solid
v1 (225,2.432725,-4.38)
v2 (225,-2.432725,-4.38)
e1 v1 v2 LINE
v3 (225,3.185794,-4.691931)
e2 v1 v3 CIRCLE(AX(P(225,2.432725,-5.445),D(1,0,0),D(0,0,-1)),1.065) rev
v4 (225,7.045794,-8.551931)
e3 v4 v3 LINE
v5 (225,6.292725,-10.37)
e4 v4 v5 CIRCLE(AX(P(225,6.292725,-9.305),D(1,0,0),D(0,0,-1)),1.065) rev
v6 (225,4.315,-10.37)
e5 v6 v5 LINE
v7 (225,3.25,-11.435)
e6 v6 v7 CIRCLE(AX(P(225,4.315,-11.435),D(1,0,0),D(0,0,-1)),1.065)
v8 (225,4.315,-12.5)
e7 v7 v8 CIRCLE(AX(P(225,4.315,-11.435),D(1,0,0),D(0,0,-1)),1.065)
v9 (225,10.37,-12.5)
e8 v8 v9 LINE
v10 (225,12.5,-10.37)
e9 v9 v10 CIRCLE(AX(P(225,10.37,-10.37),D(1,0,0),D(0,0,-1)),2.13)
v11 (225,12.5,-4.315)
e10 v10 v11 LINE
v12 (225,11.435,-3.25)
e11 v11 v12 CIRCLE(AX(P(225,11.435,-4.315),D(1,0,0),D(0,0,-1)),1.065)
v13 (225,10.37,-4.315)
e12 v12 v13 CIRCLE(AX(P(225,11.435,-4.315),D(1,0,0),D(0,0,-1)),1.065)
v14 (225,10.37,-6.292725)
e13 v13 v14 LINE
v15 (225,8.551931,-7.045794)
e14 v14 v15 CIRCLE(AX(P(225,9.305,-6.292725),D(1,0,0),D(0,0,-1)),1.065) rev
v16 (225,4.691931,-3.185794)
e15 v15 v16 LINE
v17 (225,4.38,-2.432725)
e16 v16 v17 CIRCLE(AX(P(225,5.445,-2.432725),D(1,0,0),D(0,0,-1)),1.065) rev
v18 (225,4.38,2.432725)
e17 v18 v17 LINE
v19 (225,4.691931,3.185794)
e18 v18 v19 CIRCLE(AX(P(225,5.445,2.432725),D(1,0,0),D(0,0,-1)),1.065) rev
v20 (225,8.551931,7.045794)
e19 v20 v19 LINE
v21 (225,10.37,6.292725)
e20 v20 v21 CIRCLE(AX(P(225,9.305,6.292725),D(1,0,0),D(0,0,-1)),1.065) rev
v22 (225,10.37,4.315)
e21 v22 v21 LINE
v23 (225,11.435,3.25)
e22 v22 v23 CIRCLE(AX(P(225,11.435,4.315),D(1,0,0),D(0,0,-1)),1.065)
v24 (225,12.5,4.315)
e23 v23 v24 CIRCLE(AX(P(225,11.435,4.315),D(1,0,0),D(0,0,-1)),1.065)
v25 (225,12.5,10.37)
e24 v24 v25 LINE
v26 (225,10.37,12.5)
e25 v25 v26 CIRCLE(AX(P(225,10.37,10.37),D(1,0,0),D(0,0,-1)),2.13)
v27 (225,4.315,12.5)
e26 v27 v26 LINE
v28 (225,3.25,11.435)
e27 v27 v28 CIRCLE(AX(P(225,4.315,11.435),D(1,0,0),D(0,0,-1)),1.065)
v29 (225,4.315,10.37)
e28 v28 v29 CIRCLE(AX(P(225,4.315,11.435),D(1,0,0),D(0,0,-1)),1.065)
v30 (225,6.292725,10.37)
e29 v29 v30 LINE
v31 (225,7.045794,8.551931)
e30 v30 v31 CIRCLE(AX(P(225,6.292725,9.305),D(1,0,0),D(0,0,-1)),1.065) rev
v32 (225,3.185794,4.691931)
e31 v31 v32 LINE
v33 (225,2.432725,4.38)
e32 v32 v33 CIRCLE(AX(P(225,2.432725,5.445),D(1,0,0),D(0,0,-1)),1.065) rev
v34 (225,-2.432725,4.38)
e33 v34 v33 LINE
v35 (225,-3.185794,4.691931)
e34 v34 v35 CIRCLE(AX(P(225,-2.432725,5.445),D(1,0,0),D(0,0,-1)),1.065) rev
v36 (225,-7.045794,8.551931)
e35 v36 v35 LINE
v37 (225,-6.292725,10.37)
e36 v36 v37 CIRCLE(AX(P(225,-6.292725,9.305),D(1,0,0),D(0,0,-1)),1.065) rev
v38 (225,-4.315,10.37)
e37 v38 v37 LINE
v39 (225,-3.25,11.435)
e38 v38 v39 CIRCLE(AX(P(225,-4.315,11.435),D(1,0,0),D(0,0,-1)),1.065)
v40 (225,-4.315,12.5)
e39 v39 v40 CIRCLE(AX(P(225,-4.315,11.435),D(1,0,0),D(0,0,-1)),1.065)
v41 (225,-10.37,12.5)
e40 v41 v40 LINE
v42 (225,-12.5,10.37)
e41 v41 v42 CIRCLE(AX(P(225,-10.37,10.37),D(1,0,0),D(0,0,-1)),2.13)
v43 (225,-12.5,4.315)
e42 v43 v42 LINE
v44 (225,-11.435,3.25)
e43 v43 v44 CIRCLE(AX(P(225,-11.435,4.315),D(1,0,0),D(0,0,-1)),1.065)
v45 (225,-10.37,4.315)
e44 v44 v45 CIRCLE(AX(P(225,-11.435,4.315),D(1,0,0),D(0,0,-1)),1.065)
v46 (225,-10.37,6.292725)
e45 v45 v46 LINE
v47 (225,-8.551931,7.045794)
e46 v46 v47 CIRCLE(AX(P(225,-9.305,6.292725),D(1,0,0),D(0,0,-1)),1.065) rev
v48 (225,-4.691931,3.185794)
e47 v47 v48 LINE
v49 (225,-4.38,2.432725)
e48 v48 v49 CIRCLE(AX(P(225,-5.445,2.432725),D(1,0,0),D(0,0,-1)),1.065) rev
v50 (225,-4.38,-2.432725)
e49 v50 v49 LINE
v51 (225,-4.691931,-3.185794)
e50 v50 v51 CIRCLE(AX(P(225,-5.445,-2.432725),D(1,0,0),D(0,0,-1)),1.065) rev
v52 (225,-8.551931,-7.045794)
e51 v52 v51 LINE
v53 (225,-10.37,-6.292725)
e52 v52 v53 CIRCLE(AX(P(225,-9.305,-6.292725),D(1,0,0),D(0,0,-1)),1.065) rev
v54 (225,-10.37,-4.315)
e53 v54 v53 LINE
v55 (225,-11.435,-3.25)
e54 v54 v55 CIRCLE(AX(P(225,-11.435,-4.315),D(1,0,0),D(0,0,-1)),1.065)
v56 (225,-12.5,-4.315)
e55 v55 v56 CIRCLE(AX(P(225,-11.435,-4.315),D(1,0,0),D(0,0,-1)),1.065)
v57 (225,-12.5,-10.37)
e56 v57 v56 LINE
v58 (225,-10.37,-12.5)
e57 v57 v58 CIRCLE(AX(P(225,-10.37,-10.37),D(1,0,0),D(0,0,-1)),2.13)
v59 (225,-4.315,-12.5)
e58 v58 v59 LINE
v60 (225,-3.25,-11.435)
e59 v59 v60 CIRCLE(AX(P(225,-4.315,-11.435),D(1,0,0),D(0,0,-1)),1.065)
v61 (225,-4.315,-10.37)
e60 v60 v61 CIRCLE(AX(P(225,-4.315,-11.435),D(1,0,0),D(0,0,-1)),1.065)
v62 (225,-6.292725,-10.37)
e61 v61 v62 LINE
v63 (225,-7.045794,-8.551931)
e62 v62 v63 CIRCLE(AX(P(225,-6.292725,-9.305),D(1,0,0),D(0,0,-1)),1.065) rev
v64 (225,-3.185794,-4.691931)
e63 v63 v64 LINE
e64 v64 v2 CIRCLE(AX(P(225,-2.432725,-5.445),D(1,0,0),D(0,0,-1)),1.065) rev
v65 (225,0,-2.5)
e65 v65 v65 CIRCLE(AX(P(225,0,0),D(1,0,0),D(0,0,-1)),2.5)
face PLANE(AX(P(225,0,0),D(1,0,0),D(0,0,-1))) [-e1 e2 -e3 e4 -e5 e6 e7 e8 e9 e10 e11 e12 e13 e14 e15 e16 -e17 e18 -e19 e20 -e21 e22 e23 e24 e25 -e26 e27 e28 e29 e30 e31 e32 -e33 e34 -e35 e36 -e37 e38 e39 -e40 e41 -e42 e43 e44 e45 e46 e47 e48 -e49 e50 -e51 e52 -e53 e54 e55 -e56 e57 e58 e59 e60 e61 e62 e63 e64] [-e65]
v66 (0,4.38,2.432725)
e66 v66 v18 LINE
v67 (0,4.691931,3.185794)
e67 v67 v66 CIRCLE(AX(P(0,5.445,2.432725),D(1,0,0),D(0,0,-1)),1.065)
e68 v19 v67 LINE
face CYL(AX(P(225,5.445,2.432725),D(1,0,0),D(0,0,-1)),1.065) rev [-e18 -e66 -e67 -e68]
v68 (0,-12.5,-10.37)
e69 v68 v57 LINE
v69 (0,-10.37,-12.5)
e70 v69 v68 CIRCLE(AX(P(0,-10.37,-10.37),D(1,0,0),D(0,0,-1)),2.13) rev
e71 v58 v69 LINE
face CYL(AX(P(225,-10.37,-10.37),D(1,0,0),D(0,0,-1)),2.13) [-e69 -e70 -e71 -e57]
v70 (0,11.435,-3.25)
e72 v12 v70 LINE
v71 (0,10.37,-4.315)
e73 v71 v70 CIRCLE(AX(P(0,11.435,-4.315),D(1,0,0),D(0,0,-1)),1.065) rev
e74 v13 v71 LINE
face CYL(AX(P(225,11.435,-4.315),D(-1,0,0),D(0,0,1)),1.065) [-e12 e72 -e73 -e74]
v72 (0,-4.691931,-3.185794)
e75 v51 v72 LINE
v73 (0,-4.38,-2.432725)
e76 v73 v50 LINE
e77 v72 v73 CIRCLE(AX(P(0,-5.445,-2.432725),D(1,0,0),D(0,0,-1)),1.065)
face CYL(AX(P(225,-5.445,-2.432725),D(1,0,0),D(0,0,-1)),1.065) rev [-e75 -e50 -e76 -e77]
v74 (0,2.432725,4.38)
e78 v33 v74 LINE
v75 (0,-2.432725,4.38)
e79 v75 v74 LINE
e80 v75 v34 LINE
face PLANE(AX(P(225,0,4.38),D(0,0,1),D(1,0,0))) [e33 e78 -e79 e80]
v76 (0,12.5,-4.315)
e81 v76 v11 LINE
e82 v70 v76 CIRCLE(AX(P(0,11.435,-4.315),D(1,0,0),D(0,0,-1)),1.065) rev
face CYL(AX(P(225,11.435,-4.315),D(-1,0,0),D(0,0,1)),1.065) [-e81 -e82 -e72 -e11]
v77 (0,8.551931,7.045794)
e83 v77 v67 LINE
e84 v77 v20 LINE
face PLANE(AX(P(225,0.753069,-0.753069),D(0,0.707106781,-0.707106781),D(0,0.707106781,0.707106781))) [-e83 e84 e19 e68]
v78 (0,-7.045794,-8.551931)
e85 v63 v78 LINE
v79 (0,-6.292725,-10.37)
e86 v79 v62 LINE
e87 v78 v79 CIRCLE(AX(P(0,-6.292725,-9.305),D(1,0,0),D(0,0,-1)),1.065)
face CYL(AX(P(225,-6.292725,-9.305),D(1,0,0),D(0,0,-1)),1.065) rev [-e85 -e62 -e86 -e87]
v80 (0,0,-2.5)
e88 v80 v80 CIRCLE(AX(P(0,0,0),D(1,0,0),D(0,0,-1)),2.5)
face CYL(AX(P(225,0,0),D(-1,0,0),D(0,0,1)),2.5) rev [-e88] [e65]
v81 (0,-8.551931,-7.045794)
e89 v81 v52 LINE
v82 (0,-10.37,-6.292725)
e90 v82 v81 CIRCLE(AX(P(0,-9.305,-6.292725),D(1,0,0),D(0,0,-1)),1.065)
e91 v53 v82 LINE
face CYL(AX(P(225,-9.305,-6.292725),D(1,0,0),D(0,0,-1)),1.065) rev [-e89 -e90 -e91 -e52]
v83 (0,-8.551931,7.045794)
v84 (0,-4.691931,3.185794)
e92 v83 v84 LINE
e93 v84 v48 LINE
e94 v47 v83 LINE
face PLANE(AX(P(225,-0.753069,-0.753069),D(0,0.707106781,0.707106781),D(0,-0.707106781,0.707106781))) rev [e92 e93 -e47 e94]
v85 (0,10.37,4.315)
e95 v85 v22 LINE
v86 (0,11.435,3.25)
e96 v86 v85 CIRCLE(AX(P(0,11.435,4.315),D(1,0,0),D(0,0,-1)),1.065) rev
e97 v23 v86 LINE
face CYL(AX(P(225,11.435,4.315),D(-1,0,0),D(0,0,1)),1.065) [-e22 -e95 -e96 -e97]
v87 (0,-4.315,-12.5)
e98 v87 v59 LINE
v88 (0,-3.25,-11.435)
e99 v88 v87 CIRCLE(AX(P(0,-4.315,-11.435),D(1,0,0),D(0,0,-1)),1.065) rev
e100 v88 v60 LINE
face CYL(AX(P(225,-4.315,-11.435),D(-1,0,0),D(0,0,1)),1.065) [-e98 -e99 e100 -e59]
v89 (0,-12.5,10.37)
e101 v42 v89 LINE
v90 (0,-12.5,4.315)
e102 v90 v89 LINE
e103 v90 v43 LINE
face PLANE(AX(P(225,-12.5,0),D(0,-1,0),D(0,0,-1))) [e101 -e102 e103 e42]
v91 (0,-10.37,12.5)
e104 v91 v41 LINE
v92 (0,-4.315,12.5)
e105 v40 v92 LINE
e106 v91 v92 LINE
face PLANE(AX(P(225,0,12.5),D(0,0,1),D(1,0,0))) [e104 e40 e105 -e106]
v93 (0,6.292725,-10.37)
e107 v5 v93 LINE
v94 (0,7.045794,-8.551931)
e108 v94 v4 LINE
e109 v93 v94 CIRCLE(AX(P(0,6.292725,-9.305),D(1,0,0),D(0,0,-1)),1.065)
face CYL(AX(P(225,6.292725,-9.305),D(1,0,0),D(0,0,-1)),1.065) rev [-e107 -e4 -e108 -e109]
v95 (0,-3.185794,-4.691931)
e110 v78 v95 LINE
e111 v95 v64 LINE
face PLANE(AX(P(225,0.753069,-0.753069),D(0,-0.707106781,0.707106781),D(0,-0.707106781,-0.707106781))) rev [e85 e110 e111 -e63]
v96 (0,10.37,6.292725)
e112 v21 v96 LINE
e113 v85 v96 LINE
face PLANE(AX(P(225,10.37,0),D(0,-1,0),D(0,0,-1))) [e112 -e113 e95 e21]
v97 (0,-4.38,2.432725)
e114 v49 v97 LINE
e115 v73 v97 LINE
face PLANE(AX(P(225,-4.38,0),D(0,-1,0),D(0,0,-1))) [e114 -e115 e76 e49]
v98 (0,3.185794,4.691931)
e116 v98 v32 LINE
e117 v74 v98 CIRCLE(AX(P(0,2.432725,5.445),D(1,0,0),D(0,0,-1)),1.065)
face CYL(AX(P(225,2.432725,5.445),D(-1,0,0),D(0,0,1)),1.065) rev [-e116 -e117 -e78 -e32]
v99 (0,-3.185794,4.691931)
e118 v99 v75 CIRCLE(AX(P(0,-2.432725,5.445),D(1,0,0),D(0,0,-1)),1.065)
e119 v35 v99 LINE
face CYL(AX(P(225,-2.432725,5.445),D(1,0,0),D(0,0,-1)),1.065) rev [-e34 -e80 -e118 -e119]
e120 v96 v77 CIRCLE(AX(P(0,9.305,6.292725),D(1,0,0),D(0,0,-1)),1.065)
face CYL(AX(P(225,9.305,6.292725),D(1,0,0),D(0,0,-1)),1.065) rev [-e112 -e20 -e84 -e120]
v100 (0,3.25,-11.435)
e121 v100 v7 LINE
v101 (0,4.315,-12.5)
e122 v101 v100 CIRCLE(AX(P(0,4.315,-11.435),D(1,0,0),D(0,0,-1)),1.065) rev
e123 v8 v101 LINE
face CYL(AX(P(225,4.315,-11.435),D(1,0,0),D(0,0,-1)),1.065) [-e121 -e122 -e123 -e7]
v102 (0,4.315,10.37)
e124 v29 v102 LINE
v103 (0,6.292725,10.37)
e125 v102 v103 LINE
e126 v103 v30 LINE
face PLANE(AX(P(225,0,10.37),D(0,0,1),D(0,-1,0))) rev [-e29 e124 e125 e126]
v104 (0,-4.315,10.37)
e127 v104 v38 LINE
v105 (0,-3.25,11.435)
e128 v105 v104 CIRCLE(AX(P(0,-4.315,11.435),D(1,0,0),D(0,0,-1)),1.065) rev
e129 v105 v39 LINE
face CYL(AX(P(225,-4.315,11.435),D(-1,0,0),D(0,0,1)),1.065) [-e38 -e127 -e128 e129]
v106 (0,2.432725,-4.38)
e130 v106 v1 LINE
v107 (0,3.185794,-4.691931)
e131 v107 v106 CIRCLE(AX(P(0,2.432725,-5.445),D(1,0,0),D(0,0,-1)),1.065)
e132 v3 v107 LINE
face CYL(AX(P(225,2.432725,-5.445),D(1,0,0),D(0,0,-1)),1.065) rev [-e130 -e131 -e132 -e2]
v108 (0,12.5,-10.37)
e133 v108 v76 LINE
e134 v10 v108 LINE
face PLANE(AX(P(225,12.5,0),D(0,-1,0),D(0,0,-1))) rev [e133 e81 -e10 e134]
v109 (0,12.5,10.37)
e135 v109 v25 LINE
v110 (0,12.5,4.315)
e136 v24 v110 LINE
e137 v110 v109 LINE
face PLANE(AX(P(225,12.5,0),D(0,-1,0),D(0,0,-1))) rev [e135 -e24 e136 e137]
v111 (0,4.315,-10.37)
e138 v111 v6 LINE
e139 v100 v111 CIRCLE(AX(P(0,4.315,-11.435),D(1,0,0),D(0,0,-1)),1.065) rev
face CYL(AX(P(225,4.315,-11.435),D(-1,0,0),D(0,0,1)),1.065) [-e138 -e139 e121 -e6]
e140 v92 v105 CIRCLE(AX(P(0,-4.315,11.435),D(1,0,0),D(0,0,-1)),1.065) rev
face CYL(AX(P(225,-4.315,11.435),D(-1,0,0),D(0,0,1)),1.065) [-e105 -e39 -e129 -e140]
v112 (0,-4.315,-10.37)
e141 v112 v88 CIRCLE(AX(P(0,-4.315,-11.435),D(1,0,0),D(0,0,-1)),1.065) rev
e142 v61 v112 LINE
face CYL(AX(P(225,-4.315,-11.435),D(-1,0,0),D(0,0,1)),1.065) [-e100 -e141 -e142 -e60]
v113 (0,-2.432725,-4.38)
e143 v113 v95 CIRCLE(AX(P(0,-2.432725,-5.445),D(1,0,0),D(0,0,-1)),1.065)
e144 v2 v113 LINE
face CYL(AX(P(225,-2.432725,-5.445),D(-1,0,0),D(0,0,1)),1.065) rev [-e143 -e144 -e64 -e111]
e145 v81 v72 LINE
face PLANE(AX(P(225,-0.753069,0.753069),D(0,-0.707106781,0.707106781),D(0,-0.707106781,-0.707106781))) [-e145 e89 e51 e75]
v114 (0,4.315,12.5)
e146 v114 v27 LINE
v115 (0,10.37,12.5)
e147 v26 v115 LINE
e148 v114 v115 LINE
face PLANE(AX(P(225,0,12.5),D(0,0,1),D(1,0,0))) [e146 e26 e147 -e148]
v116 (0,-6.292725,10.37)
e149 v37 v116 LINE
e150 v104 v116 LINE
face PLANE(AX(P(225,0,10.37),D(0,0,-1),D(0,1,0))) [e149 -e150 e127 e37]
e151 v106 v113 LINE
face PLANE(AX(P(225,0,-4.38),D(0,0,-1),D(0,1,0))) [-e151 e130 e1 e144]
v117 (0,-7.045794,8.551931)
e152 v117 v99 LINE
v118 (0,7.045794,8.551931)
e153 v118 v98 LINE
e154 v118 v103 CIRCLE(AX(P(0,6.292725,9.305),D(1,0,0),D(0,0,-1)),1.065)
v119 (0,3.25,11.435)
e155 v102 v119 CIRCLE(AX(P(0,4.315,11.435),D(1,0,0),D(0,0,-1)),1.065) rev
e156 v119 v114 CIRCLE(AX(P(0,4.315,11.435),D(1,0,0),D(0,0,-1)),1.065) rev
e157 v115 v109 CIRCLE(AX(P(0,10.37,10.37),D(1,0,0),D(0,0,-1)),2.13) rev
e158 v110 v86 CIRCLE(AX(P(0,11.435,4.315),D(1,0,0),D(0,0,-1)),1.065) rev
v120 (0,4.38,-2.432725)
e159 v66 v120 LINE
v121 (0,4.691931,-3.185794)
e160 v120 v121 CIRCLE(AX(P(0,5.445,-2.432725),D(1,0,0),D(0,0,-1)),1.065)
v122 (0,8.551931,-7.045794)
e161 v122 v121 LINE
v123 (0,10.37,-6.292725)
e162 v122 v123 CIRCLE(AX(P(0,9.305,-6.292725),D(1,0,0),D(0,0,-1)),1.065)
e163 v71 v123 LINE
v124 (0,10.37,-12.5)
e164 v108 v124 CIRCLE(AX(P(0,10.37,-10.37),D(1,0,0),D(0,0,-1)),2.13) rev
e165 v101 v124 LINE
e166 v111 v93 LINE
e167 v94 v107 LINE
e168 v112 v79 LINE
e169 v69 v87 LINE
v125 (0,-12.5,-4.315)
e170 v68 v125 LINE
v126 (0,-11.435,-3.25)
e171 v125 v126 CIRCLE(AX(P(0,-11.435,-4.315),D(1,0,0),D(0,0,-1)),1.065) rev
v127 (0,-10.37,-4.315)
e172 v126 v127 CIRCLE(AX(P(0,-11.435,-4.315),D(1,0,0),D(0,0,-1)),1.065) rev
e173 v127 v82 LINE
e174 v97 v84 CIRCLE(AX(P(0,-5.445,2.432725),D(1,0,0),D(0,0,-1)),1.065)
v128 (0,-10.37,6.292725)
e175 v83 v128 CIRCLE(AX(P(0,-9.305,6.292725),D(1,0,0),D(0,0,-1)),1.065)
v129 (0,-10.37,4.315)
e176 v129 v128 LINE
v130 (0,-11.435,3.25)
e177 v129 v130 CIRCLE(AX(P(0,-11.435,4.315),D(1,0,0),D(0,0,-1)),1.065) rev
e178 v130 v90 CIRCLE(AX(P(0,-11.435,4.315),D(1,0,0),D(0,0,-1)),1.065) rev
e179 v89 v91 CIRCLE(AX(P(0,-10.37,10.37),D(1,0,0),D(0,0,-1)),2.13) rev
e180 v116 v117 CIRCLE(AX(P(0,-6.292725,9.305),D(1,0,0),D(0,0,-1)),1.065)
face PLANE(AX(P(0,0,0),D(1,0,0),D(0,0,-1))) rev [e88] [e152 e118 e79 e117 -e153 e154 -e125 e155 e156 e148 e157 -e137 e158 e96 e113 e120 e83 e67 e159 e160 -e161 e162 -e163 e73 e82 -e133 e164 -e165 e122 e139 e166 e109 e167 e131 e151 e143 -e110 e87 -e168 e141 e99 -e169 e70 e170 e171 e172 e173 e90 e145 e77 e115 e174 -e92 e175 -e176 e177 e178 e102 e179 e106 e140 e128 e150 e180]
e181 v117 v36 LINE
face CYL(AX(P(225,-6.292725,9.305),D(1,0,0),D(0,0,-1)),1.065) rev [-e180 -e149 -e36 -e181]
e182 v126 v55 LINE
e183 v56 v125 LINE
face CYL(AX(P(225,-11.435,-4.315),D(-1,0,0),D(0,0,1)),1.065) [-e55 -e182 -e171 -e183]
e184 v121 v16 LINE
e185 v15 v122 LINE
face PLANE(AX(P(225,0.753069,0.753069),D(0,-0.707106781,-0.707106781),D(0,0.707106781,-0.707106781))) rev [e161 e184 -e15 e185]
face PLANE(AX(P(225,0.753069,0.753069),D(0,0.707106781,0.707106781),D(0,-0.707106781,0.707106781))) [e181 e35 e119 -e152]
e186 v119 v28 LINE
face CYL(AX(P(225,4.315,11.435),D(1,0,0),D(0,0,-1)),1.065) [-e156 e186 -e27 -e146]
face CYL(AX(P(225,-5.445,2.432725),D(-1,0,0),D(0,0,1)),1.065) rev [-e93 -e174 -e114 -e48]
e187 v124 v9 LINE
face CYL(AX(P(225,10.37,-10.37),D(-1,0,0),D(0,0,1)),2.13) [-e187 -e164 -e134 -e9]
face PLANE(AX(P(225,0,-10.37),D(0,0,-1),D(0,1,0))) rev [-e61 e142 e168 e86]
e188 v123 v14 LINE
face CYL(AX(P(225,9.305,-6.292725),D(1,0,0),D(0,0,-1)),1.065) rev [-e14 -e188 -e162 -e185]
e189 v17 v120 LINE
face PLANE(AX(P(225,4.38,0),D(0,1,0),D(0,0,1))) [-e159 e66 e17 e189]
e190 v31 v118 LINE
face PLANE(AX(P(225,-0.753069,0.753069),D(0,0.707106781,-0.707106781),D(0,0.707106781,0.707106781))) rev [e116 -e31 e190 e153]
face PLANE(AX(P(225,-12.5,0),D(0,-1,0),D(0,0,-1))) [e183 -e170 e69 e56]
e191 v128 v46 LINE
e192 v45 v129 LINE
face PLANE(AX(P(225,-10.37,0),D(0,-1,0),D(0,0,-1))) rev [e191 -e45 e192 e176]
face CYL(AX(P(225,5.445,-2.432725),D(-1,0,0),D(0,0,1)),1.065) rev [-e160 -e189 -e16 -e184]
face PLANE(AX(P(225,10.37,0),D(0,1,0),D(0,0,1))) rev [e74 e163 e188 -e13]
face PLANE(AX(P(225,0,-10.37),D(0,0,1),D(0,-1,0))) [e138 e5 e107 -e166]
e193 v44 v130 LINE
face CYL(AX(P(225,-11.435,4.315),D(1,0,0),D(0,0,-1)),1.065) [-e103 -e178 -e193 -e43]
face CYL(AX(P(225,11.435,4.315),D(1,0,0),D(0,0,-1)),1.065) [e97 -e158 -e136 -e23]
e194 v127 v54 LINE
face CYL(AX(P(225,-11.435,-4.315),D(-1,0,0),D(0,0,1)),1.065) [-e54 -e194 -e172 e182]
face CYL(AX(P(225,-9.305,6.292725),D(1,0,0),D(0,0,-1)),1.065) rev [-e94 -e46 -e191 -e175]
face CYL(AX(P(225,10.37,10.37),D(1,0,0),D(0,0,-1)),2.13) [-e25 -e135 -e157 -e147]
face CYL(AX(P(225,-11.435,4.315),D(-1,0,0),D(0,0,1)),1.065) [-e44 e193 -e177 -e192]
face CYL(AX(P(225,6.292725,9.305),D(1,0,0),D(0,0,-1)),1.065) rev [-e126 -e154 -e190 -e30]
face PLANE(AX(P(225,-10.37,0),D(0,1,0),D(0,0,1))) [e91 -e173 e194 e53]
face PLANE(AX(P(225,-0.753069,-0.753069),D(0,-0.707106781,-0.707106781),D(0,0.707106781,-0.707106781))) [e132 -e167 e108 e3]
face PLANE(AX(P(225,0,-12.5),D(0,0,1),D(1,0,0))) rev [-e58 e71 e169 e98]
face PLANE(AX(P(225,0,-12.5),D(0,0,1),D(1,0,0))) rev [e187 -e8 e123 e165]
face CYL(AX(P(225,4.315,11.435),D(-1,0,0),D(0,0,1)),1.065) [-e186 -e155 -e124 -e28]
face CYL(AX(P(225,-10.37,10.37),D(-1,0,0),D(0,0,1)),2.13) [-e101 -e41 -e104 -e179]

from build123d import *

# Parameters (mm, degrees)
SKETCH1_R           = 2.5
BOSS_EXTRUDE1_DEPTH = 225
FILLET1_R           = 1.065
FILLET2_R           = 2.13


with BuildPart() as part:
    # Sketch1 → Boss-Extrude1 (new body)
    with BuildSketch(Plane.YZ):
        Polygon((-12.5, -3.25), (-12.5, -12.5), (-3.25, -12.5), (-3.25, -10.37), (-8.863862556, -10.37), (-2.873862556, -4.38), (2.873862556, -4.38), (8.863862556, -10.37), (3.25, -10.37), (3.25, -12.5), (12.5, -12.5), (12.5, -3.25), (10.37, -3.25), (10.37, -8.863862556), (4.38, -2.873862556), (4.38, 2.873862556), (10.37, 8.863862556), (10.37, 3.25), (12.5, 3.25), (12.5, 12.5), (3.25, 12.5), (3.25, 10.37), (8.863862556, 10.37), (2.873862556, 4.38), (-2.873862556, 4.38), (-8.863862556, 10.37), (-3.25, 10.37), (-3.25, 12.5), (-12.5, 12.5), (-12.5, 3.25), (-10.37, 3.25), (-10.37, 8.863862556), (-4.38, 2.873862556), (-4.38, -2.873862556), (-10.37, -8.863862556), (-10.37, -3.25), align=None)
        with Locations(Location((0, 0, 0), (0, 0, 270))):
            Circle(SKETCH1_R, mode=Mode.SUBTRACT)
    extrude(amount=BOSS_EXTRUDE1_DEPTH)

    # Fillet1
    fillet1_edges = [part.edges().sort_by_distance(p)[0] for p in [
        (112.5, -10.37, -8.863862556),
        (112.5, 2.873862556, -4.38),
        (112.5, -2.873862556, -4.38),
        (112.5, -4.38, 2.873862556),
        (112.5, -4.38, -2.873862556),
        (112.5, -2.873862556, 4.38),
        (112.5, 2.873862556, 4.38),
        (112.5, 4.38, 2.873862556),
        (112.5, 4.38, -2.873862556),
        (112.5, -8.863862556, -10.37),
        (112.5, 8.863862556, -10.37),
        (112.5, 10.37, -8.863862556),
        (112.5, -10.37, 8.863862556),
        (112.5, -8.863862556, 10.37),
        (112.5, 10.37, 8.863862556),
        (112.5, 8.863862556, 10.37),
        (112.5, 12.5, 3.25),
        (112.5, -3.25, -12.5),
        (112.5, -10.37, 3.25),
        (112.5, 10.37, 3.25),
        (112.5, -10.37, -3.25),
        (112.5, -12.5, -3.25),
        (112.5, -12.5, 3.25),
        (112.5, 3.25, -10.37),
        (112.5, -3.25, -10.37),
        (112.5, 3.25, -12.5),
        (112.5, 10.37, -3.25),
        (112.5, 12.5, -3.25),
        (112.5, 3.25, 12.5),
        (112.5, 3.25, 10.37),
        (112.5, -3.25, 10.37),
        (112.5, -3.25, 12.5),
    ]]
    fillet(fillet1_edges, radius=FILLET1_R - 0.0001)  # a hair under: the kernel refuses the full size

    # Fillet2
    fillet2_edges = [part.edges().sort_by_distance(p)[0] for p in [
        (112.5, -12.5, 12.5),
        (112.5, 12.5, 12.5),
        (112.5, 12.5, -12.5),
        (112.5, -12.5, -12.5),
    ]]
    fillet(fillet2_edges, radius=FILLET2_R)


solid = part.part
